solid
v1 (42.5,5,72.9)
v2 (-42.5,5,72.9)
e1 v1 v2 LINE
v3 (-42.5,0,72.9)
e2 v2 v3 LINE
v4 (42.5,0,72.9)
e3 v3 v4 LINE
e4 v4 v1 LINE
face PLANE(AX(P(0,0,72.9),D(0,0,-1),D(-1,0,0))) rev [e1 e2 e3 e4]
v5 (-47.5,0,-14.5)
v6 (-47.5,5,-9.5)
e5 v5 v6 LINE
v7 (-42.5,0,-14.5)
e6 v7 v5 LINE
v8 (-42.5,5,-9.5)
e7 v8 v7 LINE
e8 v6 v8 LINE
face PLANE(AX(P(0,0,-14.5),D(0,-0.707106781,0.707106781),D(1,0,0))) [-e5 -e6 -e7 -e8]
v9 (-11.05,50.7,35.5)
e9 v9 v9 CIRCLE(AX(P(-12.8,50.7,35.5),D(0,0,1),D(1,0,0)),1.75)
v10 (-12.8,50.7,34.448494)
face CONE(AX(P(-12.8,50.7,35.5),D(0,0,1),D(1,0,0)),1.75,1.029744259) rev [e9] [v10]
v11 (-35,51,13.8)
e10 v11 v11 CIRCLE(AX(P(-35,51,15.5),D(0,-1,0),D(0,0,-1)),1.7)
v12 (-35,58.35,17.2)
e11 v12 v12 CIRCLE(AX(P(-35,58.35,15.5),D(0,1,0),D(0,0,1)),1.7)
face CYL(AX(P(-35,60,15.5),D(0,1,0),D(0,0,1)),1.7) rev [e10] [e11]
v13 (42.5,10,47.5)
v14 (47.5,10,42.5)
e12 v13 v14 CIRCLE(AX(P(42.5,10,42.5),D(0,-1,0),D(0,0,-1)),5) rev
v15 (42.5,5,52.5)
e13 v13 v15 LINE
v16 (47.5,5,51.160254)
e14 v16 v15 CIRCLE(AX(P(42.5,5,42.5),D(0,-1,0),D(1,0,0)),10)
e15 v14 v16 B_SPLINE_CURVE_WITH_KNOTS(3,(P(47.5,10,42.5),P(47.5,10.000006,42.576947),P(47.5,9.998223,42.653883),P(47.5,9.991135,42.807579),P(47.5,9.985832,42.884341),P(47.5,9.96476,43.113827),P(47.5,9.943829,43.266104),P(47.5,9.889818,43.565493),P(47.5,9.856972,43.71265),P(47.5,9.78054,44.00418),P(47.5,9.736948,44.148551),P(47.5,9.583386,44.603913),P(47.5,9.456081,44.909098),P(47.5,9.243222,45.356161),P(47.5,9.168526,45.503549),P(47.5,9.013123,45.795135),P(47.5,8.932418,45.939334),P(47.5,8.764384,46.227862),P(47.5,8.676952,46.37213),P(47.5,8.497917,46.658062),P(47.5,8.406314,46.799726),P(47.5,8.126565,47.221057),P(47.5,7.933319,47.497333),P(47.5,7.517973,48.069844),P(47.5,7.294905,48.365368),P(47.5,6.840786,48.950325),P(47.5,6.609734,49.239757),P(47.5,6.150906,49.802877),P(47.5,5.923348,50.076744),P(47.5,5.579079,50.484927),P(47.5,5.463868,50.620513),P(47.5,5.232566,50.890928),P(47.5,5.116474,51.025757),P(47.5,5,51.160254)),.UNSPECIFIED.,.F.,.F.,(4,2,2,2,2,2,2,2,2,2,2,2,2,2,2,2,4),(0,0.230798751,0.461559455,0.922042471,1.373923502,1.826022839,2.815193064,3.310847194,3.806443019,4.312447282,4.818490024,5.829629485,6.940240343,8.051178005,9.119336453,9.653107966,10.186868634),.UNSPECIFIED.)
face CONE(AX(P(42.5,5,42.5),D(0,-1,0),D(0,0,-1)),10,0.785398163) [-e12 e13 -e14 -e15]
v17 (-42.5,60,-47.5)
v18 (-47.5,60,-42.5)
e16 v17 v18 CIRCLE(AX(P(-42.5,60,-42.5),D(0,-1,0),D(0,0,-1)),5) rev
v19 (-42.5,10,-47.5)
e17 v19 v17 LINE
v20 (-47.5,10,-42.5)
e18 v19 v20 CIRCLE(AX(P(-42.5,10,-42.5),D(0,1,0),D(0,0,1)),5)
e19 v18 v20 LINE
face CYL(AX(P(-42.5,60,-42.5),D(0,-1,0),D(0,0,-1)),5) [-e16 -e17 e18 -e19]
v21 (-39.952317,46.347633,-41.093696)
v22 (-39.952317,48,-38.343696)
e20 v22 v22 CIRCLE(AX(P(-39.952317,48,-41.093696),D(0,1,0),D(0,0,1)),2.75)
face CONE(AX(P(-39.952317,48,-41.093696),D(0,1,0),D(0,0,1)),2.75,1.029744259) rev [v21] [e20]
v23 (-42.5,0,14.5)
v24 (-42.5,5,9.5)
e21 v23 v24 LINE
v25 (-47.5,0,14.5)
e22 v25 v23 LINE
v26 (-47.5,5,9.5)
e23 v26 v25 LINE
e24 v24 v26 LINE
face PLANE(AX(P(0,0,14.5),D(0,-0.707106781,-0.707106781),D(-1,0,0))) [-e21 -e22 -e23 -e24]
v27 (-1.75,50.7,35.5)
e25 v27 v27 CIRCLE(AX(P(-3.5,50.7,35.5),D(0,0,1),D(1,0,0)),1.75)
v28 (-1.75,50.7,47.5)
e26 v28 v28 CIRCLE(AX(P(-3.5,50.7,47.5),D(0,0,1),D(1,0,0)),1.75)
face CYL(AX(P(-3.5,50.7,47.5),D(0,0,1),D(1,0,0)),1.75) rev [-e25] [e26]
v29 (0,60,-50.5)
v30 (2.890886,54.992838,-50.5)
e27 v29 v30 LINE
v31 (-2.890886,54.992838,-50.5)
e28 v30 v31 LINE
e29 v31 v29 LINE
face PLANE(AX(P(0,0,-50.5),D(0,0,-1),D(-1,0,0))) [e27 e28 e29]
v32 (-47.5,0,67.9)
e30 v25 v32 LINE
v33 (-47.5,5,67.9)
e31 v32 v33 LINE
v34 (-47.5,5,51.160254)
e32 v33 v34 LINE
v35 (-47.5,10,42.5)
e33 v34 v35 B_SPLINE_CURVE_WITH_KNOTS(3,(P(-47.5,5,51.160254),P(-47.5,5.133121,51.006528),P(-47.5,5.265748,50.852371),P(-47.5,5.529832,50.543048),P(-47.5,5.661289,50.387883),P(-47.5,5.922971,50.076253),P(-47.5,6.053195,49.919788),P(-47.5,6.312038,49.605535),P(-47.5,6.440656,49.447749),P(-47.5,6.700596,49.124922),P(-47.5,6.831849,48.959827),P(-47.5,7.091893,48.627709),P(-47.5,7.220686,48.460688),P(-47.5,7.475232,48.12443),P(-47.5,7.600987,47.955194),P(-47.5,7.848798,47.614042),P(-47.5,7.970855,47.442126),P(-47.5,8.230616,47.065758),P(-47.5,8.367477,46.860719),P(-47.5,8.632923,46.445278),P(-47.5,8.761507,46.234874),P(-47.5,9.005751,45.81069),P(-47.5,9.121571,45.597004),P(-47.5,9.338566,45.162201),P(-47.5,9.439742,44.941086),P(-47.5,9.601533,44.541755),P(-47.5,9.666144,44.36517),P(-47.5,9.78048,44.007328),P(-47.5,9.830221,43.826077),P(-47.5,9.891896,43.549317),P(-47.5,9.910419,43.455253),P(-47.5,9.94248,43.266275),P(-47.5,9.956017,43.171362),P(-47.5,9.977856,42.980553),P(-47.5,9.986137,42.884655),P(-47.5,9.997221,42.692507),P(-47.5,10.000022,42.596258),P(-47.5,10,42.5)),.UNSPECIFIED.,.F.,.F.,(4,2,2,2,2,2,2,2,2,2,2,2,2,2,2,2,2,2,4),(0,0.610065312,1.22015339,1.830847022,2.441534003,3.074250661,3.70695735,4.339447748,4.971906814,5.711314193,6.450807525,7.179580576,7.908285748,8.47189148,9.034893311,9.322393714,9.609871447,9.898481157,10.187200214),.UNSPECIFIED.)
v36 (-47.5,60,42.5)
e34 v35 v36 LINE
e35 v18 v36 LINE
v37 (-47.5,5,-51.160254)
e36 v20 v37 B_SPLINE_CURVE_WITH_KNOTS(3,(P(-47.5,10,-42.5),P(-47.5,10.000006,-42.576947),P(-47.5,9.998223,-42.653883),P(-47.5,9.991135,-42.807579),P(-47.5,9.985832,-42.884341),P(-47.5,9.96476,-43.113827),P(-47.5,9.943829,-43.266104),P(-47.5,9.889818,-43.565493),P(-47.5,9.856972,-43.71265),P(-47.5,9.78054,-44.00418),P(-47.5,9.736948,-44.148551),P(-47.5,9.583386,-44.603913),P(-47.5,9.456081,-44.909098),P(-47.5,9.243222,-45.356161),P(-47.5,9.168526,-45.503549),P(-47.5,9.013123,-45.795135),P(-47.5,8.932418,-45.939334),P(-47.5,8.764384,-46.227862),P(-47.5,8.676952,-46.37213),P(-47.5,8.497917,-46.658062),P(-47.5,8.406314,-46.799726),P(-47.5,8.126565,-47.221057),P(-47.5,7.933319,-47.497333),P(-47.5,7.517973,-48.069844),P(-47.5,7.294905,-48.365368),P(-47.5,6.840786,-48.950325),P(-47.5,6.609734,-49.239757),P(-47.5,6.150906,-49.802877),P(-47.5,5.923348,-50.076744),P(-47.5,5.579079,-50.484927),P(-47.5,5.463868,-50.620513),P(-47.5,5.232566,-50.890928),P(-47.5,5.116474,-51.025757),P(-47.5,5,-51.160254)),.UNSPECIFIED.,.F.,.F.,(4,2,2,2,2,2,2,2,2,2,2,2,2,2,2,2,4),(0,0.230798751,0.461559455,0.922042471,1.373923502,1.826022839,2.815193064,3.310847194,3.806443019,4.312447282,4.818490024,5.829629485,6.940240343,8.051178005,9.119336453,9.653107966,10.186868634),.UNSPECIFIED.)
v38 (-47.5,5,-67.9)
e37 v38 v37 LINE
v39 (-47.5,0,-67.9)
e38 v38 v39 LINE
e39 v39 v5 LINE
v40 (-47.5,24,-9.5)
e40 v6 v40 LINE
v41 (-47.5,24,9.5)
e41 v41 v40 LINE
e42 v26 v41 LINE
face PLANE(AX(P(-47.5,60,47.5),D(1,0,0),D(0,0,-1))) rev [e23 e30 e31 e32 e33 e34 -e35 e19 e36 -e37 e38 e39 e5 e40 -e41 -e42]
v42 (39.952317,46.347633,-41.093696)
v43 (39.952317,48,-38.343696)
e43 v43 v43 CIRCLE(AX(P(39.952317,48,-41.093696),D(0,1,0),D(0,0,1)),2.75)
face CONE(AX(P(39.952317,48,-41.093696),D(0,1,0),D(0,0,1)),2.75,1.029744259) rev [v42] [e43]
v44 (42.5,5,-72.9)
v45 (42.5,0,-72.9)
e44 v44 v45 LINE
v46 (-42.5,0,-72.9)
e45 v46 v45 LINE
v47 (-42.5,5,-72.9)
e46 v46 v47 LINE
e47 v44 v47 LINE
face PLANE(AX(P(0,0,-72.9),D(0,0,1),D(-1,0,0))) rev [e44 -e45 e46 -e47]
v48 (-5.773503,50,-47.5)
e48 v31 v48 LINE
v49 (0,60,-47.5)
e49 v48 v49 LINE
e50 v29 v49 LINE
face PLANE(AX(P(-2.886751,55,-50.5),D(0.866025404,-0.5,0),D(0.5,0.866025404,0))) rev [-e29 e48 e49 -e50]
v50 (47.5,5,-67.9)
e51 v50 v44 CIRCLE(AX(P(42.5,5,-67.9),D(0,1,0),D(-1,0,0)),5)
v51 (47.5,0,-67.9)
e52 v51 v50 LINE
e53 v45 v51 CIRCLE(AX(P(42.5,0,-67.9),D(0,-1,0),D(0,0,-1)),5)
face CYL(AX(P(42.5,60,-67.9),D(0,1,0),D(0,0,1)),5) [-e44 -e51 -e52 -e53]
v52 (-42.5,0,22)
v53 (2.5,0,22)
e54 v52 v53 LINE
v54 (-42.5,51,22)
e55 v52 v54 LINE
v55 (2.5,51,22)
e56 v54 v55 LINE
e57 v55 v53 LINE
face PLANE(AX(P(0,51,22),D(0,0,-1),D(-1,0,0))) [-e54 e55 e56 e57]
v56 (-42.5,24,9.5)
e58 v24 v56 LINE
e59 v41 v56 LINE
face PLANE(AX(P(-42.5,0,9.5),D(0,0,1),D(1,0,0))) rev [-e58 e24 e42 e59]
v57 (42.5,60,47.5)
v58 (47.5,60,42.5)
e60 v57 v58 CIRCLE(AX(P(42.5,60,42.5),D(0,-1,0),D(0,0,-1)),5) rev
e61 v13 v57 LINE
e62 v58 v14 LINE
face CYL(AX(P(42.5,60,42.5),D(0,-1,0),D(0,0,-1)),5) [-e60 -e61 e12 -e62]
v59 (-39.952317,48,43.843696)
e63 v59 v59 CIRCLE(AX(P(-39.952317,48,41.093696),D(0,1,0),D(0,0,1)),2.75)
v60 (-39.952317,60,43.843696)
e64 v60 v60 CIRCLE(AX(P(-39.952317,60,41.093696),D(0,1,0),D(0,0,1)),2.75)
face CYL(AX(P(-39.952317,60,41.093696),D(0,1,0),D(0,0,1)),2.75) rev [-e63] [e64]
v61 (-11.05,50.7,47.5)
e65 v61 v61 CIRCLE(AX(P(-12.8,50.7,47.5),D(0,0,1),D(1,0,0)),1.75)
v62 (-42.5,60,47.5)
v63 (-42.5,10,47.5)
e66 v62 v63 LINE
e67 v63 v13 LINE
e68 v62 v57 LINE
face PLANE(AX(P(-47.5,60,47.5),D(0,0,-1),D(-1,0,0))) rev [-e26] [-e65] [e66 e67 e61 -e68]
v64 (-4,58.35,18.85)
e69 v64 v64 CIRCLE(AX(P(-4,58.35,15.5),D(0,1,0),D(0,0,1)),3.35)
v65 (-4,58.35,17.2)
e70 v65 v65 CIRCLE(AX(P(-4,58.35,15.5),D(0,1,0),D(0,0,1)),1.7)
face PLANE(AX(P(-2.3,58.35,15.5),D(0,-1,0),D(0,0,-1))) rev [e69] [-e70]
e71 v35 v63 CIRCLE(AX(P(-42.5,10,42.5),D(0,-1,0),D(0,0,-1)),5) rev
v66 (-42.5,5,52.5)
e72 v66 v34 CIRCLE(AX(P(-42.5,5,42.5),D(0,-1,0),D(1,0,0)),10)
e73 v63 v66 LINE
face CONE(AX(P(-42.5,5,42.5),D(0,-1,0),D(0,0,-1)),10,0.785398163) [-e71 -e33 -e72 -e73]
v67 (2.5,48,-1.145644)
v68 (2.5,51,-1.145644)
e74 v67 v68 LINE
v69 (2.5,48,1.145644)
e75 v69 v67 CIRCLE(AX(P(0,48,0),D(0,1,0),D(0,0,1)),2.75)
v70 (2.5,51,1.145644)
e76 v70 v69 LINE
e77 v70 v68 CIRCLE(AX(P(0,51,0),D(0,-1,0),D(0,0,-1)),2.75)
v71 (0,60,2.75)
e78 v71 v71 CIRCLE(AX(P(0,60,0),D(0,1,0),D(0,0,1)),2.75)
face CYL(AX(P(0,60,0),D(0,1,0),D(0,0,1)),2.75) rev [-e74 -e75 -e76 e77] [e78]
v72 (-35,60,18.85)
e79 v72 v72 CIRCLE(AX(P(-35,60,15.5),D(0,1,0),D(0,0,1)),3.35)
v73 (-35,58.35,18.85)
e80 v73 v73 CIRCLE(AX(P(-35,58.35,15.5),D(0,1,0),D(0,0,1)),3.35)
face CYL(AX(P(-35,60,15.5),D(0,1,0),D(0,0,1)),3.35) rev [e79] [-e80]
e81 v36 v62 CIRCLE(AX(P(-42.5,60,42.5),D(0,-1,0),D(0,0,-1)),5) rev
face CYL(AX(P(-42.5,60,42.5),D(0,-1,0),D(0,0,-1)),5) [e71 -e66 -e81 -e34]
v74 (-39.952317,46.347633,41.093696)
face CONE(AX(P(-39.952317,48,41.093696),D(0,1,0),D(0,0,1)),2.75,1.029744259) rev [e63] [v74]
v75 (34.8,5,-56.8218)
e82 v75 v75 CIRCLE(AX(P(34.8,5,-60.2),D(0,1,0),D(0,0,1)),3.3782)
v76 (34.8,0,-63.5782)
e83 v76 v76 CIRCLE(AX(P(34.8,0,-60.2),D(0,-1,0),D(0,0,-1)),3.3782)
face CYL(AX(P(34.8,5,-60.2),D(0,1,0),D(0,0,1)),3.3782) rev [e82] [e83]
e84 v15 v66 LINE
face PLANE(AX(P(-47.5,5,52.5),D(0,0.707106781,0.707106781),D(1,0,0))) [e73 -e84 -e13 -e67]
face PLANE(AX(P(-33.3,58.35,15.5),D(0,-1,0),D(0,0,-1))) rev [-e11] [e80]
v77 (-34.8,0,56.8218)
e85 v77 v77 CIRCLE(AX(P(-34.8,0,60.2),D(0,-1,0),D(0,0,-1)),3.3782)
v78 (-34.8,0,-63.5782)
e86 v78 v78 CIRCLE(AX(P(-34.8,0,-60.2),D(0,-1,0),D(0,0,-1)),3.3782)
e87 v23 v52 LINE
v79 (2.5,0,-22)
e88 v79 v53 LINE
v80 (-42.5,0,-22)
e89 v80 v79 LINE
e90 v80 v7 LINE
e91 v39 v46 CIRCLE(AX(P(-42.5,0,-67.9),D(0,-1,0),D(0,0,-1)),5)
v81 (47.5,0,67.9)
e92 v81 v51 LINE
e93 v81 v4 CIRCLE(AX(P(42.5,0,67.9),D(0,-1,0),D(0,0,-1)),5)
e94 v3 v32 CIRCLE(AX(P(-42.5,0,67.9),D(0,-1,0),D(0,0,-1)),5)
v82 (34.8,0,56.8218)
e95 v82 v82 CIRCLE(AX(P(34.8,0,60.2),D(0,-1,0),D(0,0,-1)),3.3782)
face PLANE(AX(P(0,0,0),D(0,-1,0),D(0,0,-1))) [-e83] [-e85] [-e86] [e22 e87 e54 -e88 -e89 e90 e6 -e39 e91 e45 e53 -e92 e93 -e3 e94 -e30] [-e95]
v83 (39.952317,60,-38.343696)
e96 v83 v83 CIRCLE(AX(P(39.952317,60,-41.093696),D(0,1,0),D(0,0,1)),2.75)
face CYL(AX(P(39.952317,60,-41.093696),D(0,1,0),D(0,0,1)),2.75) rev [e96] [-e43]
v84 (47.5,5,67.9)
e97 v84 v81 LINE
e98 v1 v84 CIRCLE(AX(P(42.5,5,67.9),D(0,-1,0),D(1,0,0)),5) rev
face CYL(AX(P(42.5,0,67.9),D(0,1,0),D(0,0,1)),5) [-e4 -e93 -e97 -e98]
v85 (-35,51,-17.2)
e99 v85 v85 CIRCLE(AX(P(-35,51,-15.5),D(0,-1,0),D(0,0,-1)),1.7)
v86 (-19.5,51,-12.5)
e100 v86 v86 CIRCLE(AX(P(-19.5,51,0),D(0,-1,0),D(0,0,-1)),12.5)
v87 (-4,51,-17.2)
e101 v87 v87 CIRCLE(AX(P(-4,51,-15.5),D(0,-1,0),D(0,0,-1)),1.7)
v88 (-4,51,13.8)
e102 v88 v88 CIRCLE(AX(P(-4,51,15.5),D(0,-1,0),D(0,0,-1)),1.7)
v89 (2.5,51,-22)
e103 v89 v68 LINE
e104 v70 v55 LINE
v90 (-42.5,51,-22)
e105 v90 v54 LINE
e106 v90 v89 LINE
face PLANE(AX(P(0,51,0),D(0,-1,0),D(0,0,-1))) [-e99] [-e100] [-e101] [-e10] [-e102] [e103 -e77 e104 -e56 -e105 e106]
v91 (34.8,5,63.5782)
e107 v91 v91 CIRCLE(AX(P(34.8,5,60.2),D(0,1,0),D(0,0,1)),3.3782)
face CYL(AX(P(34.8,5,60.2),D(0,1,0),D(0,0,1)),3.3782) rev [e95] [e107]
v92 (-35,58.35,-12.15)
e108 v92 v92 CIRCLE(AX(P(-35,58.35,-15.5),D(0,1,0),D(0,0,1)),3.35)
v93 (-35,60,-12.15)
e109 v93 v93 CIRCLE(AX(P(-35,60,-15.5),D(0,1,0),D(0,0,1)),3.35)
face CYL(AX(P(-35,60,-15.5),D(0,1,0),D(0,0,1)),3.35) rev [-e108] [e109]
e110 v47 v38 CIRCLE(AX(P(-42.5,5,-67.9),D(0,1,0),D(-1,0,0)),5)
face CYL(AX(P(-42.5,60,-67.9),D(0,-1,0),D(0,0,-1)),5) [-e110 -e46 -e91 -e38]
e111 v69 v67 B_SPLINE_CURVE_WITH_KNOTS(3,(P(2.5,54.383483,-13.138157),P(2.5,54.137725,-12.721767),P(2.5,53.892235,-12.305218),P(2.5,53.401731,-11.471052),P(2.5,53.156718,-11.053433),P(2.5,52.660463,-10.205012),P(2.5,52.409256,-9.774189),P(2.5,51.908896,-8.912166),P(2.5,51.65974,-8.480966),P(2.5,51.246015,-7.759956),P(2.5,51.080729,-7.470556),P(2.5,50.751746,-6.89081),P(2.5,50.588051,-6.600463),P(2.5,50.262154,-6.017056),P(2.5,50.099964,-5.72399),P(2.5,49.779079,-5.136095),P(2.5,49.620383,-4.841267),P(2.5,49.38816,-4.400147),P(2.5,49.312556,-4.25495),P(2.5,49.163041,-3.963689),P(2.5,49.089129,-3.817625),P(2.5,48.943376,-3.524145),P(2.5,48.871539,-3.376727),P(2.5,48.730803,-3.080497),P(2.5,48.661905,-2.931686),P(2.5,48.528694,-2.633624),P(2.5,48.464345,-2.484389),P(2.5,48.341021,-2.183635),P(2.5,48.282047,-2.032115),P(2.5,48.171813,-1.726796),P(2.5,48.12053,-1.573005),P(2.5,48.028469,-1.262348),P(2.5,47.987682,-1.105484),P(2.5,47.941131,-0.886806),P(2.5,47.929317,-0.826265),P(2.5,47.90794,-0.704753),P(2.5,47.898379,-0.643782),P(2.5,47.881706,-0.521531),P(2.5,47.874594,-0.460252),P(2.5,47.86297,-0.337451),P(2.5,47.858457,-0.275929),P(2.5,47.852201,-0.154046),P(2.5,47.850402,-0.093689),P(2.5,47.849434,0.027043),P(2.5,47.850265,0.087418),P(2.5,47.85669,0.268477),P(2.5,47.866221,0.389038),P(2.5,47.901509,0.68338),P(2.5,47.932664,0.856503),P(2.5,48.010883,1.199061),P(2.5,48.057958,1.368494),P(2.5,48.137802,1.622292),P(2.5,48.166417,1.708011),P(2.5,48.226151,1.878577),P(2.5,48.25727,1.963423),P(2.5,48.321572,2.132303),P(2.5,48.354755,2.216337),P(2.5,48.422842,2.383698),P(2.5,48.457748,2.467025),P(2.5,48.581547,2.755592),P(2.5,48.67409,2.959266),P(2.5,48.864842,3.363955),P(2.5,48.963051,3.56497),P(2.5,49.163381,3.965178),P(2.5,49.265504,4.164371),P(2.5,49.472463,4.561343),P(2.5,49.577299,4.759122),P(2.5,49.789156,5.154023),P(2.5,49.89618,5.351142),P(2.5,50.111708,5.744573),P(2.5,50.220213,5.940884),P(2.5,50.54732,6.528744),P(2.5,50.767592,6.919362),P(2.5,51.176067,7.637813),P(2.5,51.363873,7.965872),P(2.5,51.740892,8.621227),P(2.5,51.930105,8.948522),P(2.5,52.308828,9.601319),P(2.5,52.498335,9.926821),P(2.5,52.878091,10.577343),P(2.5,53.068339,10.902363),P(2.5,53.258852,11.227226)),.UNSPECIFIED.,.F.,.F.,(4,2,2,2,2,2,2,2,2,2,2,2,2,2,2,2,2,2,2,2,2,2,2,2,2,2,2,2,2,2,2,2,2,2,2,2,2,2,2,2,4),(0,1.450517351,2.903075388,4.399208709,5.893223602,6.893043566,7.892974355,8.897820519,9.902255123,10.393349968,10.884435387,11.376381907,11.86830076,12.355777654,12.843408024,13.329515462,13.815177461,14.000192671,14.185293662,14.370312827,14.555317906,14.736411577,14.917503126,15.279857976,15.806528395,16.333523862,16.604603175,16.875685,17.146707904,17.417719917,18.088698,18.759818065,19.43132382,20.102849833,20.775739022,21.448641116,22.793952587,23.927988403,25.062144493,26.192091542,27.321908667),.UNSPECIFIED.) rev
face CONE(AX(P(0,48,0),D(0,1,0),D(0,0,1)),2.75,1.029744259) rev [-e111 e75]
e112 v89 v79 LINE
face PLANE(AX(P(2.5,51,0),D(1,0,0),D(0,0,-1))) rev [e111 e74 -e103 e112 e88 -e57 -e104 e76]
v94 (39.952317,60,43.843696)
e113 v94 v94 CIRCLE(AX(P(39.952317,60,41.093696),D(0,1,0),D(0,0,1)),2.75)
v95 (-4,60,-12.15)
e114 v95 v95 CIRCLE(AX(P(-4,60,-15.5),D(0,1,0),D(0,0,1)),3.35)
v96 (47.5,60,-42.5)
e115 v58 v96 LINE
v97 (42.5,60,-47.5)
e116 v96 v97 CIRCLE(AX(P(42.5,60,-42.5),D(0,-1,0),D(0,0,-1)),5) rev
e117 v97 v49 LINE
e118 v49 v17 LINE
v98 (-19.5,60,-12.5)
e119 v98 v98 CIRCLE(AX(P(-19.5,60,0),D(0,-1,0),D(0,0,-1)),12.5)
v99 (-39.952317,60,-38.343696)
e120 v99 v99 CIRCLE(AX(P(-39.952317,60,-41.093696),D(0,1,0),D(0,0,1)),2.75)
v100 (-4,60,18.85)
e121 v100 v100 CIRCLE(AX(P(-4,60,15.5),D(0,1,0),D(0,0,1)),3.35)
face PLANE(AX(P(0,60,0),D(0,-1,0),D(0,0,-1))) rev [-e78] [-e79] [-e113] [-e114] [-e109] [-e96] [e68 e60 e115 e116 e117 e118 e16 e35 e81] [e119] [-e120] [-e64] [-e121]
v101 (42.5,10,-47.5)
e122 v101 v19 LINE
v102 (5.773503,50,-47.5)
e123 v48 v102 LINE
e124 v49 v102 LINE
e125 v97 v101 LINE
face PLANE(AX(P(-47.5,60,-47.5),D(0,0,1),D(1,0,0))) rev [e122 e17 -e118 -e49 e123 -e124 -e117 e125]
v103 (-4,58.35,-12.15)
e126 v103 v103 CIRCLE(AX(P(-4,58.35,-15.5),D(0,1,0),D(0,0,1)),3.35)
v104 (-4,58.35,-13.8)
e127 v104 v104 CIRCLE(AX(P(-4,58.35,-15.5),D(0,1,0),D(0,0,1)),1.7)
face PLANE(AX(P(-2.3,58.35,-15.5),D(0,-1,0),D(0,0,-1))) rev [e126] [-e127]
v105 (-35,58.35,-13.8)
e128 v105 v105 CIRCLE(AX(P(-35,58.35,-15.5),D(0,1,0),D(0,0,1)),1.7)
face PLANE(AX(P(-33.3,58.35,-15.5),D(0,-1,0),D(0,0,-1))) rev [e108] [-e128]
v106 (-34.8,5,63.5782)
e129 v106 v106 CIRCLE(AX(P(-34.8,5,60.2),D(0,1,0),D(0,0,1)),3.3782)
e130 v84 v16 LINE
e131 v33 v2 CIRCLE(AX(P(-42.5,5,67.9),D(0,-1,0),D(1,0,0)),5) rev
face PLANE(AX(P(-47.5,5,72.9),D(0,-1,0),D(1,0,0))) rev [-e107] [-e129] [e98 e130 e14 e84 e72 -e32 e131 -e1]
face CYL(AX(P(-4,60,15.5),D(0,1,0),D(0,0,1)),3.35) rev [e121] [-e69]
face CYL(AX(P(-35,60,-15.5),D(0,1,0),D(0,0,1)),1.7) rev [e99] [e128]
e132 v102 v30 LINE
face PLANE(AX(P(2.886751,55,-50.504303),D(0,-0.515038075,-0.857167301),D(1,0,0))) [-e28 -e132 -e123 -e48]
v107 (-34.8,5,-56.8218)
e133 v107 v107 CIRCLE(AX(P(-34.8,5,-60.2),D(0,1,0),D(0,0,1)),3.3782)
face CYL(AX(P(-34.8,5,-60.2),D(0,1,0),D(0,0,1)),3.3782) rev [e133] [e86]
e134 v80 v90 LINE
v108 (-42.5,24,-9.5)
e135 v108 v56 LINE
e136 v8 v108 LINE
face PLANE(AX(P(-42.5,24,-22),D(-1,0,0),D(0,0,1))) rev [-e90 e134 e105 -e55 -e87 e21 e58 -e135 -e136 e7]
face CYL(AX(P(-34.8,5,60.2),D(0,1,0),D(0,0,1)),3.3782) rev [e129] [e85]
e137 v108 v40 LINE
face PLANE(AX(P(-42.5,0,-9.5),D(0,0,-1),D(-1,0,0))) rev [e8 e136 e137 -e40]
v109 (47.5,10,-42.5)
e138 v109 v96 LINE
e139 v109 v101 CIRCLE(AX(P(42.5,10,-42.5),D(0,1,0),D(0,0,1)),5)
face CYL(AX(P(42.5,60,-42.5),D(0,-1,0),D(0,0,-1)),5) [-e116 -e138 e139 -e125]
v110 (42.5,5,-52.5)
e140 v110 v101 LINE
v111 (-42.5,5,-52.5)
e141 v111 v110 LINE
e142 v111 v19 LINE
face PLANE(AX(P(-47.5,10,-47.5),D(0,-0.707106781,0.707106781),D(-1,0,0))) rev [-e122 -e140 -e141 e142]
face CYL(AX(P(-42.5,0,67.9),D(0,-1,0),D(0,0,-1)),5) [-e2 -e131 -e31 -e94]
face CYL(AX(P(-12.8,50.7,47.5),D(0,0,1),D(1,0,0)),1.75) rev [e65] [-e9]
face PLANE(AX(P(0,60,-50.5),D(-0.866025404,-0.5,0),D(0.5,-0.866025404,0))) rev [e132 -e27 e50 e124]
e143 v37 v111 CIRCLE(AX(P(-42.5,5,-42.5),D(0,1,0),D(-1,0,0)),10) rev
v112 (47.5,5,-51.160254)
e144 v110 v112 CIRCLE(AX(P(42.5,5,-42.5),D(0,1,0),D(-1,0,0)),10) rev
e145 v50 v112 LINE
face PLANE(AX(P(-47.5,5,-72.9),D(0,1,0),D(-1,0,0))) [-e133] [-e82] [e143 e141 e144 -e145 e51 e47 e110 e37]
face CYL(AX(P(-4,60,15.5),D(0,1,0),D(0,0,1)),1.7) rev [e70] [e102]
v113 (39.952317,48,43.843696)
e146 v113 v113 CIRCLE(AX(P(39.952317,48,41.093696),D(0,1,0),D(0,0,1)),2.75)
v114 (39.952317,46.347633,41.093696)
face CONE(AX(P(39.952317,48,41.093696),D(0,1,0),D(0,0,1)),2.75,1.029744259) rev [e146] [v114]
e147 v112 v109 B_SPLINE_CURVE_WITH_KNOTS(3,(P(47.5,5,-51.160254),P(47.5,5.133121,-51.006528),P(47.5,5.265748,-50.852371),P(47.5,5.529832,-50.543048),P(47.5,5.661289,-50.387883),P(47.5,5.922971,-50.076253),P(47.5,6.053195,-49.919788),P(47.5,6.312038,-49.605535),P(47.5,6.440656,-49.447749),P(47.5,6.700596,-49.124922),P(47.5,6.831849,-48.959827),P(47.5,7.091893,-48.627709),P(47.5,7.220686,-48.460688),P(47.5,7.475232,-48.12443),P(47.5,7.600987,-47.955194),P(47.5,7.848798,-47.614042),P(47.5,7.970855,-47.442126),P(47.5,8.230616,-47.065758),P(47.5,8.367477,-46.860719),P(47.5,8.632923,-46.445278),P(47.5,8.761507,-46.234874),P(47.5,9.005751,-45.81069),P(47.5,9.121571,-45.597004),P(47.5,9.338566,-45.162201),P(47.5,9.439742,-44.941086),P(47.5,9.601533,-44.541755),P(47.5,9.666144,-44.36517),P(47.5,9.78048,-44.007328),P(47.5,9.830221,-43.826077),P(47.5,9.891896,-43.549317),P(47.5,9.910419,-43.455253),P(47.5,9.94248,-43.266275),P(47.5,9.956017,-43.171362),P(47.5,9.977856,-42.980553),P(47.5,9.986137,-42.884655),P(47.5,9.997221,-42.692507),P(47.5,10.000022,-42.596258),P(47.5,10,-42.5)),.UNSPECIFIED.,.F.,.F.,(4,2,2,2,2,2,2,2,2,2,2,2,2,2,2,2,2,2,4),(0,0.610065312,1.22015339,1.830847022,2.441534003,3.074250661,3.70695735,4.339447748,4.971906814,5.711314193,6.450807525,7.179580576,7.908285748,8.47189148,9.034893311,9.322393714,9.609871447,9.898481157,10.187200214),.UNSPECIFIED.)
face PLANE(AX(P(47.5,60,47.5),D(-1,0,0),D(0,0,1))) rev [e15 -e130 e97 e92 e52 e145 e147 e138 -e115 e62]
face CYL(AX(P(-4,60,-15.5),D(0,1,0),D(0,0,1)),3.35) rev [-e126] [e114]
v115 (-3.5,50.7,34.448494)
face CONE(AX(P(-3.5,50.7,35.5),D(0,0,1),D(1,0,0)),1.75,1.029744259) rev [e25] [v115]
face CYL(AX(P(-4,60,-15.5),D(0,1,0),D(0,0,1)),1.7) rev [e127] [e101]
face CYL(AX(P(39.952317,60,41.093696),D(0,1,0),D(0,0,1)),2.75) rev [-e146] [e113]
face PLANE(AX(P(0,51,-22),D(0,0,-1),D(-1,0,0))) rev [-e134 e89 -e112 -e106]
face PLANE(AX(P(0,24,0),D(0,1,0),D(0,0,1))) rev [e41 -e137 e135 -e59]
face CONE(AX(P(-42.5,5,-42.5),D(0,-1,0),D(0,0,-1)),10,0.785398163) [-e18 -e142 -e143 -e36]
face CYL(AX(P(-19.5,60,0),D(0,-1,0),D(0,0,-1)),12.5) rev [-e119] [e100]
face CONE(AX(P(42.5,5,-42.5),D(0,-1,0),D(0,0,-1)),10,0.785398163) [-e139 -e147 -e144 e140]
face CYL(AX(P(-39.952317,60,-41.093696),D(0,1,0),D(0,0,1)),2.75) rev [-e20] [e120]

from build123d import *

# Parameters (mm, degrees)
SKETCH1_W                        = 95
SKETCH1_H                        = 95
BOSS_EXTRUDE1_DEPTH              = 60
SKETCH2_W                        = 95
SKETCH2_H                        = 5
BOSS_EXTRUDE2_DEPTH              = 25.4
FILLET1_R                        = 5
F_1_4_CLEARANCE_HOLE1_AT_2_COUNT = 2
F_1_4_CLEARANCE_HOLE1_AT_2_PITCH = 69.6
BOSS_EXTRUDE3_DEPTH              = 3
CHAMFER1_SIZE                    = 5
CHAMFER1_SIZE_2                  = 3.004303095
SKETCH6_W                        = 50
SKETCH6_H                        = 44
CUT_EXTRUDE1_DEPTH               = 51
SKETCH6_3_R                      = 12.5
CUT_EXTRUDE2_DEPTH               = 106.69134307
SKETCH7_W                        = 5
SKETCH7_H                        = 44
BOSS_EXTRUDE4_DEPTH              = 27
SKETCH8_W                        = 5
SKETCH8_H                        = 12.5
BOSS_EXTRUDE5_DEPTH              = 24
CBORE_FOR_M3_SBHCS1_D            = 3.4
CBORE_FOR_M3_SBHCS1_CBORE_D      = 6.7
CBORE_FOR_M3_SBHCS1_CBORE_DEPTH  = 1.65
CHAMFER2_SIZE                    = 5
CHAMFER3_SIZE                    = 5
F_6_0MM_DOWEL_HOLE1_D            = 5.5
F_6_0MM_DOWEL_HOLE1_DEPTH        = 12
F_6_0MM_DOWEL_HOLE1_TIP          = 1.652366702
F_3_0MM_DOWEL_HOLE1_D            = 3.5
F_3_0MM_DOWEL_HOLE1_DEPTH        = 12
F_3_0MM_DOWEL_HOLE1_TIP          = 1.051506083


with BuildPart() as part:
    # Sketch1 → Boss-Extrude1 (new body)
    with BuildSketch(Plane(origin=(0, 0, 0), x_dir=(1, 0, 0), z_dir=(0, 1, 0))):
        Rectangle(SKETCH1_W, SKETCH1_H)
    extrude(amount=BOSS_EXTRUDE1_DEPTH)

    # Sketch2 → Boss-Extrude2 (add)
    with BuildSketch(Plane.XY.offset(47.5)):
        with Locations((0, 2.5)):
            Rectangle(SKETCH2_W, SKETCH2_H)
    boss_extrude2 = extrude(amount=BOSS_EXTRUDE2_DEPTH)

    # Mirror1: Boss-Extrude2 across plane
    add(boss_extrude2.mirror(Plane.XY))

    # Fillet1
    fillet1_edges = [part.edges().sort_by_distance(p)[0] for p in [
        (-47.5, 2.5, 72.9),
        (47.5, 2.5, 72.9),
        (-47.5, 2.5, -72.9),
        (47.5, 2.5, -72.9),
        (47.5, 32.5, 47.5),
        (-47.5, 32.5, 47.5),
        (-47.5, 32.5, -47.5),
        (47.5, 32.5, -47.5),
    ]]
    fillet(fillet1_edges, radius=FILLET1_R)

    # Sketch4 → 1/4 Clearance Hole1 (revolve, cut)
    with BuildSketch(Plane(origin=(34.8, 5, 60.2), x_dir=(0, 0, 1), z_dir=(1, 0, 0))):
        Polygon((0, 0), (0, 12.029827343), (3.3782, 10), (3.3782, 0), align=None)
    f_1_4_clearance_hole1 = revolve(axis=Axis((34.8, 11.35, 60.2), (0, -1, 0)), mode=Mode.SUBTRACT)

    # 1/4 Clearance Hole1 at 2: 1/4 Clearance Hole1 ×2
    with Locations(*[(-i * F_1_4_CLEARANCE_HOLE1_AT_2_PITCH, 0, 0) for i in range(1, F_1_4_CLEARANCE_HOLE1_AT_2_COUNT)]):
        add(f_1_4_clearance_hole1, mode=Mode.SUBTRACT)

    # Mirror2: 1/4 Clearance Hole1 across plane
    add(f_1_4_clearance_hole1.mirror(Plane.XY), mode=Mode.SUBTRACT)

    # Mirror2 copy 1 sketch → Mirror2 copy 1 (revolve, cut)
    with BuildSketch(Plane(origin=(-34.8, 5, -60.2), x_dir=(0, 0, -1), z_dir=(1, 0, 0))):
        Polygon((0, 0), (0, -12.029827343), (3.3782, -10), (3.3782, 0), align=None)
    revolve(axis=Axis((-34.8, 11.35, -60.2), (0, 1, 0)), mode=Mode.SUBTRACT)

    # Sketch5 → Boss-Extrude3 (add)
    with BuildSketch(Plane(origin=(0, 0, -47.5), x_dir=(-1, 0, 0), z_dir=(0, 0, -1))):
        Polygon((0, 60), (-2.886751346, 55), (2.886751346, 55), align=None)
    extrude(amount=BOSS_EXTRUDE3_DEPTH)

    # Chamfer1
    # the kernel refuses this chamfer: 5, 3.004303095 mm, written as the material it adds along each edge
    with BuildSketch(Plane(origin=(15.817899449, 55, -47.5), x_dir=(0, -0.9998016840798124, 0.01991463058083395), z_dir=(-1, 0, 0))) as chamfer1_piece_1_section:
        Polygon((CHAMFER1_SIZE * 0.99980168408, -CHAMFER1_SIZE * 0.0199146305808), (-CHAMFER1_SIZE_2 * 0.0199146305817, -CHAMFER1_SIZE_2 * 0.999801684126), (0, 0), align=None)
    chamfer1_piece_1 = extrude(amount=31.635798898, mode=Mode.PRIVATE)
    chamfer1_piece_1 = split(chamfer1_piece_1, bisect_by=Plane(origin=(-2.998221353, 54.806928285, -48.382310959), z_dir=(0.8660254037844363, -0.5000000000000041, 0)), keep=Keep.TOP, mode=Mode.PRIVATE)
    chamfer1_piece_1 = split(chamfer1_piece_1, bisect_by=Plane(origin=(2.998221353, 54.806928285, -48.382310959), z_dir=(-0.8660254037844365, -0.5000000000000039, 0)), keep=Keep.TOP, mode=Mode.PRIVATE)
    chamfer1_piece_1 = split(chamfer1_piece_1, bisect_by=Plane(origin=(0, 53.07590438, -50.5), z_dir=(0, 0, 1)), keep=Keep.TOP, mode=Mode.PRIVATE)
    add(chamfer1_piece_1)

    # Sketch6 → Cut-Extrude1 (cut)
    with BuildSketch(Plane.XZ):
        with Locations((-22.5, 0)):
            Rectangle(SKETCH6_W, SKETCH6_H)
    extrude(amount=-CUT_EXTRUDE1_DEPTH, mode=Mode.SUBTRACT)

    # Sketch6<3> → Cut-Extrude2 (cut, through all)
    with BuildSketch(Plane.XZ):
        with Locations(Location((-19.5, 0, 0), (0, 0, 270))):
            Circle(SKETCH6_3_R)
    extrude(amount=-CUT_EXTRUDE2_DEPTH, mode=Mode.SUBTRACT)

    # Sketch7 → Boss-Extrude4 (add)
    with BuildSketch(Plane.XZ.offset(-51)):
        with Locations((-45, 0)):
            Rectangle(SKETCH7_W, SKETCH7_H)
    extrude(amount=BOSS_EXTRUDE4_DEPTH)

    # Sketch8 → Boss-Extrude5 (add)
    with BuildSketch(Plane.XZ.offset(-24)):
        with Locations((-45, -15.75)):
            Rectangle(SKETCH8_W, SKETCH8_H)
        with Locations((-45, 15.75)):
            Rectangle(SKETCH8_W, SKETCH8_H)
    extrude(amount=BOSS_EXTRUDE5_DEPTH)

    # CBORE for M3 SBHCS1 (through all)
    with Locations(Plane(origin=(0, 60, 0), x_dir=(1, 0, 0), z_dir=(0, 1, 0))):
        with Locations((-19.5, 0), (-4, -15.5), (-35, 15.5), (-35, -15.5), (-4, 15.5)):
            CounterBoreHole(CBORE_FOR_M3_SBHCS1_D / 2, CBORE_FOR_M3_SBHCS1_CBORE_D / 2, CBORE_FOR_M3_SBHCS1_CBORE_DEPTH)

    # Chamfer2
    # the kernel refuses this chamfer: 5 mm, written as the material it adds along each edge
    with BuildSketch(Plane(origin=(42.5, 5, -47.5), x_dir=(0, 0.9996219169112969, 0.0274958766105808), z_dir=(-1, 0, 0))) as chamfer2_piece_1:
        Polygon((CHAMFER2_SIZE * 0.999621916911, CHAMFER2_SIZE * 0.0274958766106), (-CHAMFER2_SIZE * 0.0274958766106, CHAMFER2_SIZE * 0.999621916911), (0, 0), align=None)
    extrude(amount=85)
    with BuildSketch(Plane(origin=(42.5, 5, 47.5), x_dir=(0, 0.9996219169112968, -0.027495876610586324), z_dir=(-1, 0, 0))) as chamfer2_piece_2:
        Polygon((CHAMFER2_SIZE * 0.999621916911, -CHAMFER2_SIZE * 0.0274958766106), (-CHAMFER2_SIZE * 0.0274958766106, -CHAMFER2_SIZE * 0.999621916911), (0, 0), align=None)
    extrude(amount=85)
    with BuildSketch(Plane(origin=(-42.5, 5, 42.5), x_dir=(0, 0, 1), z_dir=(1, 0, 0))) as chamfer2_piece_3_section:
        Polygon((5, -CHAMFER2_SIZE), (5 + CHAMFER2_SIZE, 0), (5, 0), align=None)
    chamfer2_piece_3 = revolve(axis=Axis((-42.5, 5, 42.5), (0, -1, 0)), revolution_arc=237.405771779, mode=Mode.PRIVATE)
    chamfer2_piece_3 = split(chamfer2_piece_3, bisect_by=Plane(origin=(-47.5, 7.211903133, 46.338242127), z_dir=(1, 0, 0)), keep=Keep.TOP, mode=Mode.PRIVATE)
    add(chamfer2_piece_3)
    with BuildSketch(Plane(origin=(42.5, 5, 42.5), x_dir=(0, 0, 1), z_dir=(-1, 0, 0))) as chamfer2_piece_4_section:
        Polygon((5, CHAMFER2_SIZE), (5 + CHAMFER2_SIZE, 0), (5, 0), align=None)
    chamfer2_piece_4 = revolve(axis=Axis((42.5, 5, 42.5), (0, 1, 0)), revolution_arc=237.405771779, mode=Mode.PRIVATE)
    chamfer2_piece_4 = split(chamfer2_piece_4, bisect_by=Plane(origin=(47.5, 7.211903133, 46.338242127), z_dir=(-1, 0, 0)), keep=Keep.TOP, mode=Mode.PRIVATE)
    add(chamfer2_piece_4)
    with BuildSketch(Plane(origin=(42.5, 5, -42.5), x_dir=(0, 0, -1), z_dir=(-1, 0, 0))) as chamfer2_piece_5_section:
        Polygon((5 + CHAMFER2_SIZE, 0), (5, -CHAMFER2_SIZE), (5, 0), align=None)
    chamfer2_piece_5 = revolve(axis=Axis((42.5, 5, -42.5), (0, -1, 0)), revolution_arc=237.405771779, mode=Mode.PRIVATE)
    chamfer2_piece_5 = split(chamfer2_piece_5, bisect_by=Plane(origin=(47.5, 6.474161158, -49.057149182), z_dir=(-1, 0, 0)), keep=Keep.TOP, mode=Mode.PRIVATE)
    add(chamfer2_piece_5)
    with BuildSketch(Plane(origin=(-42.5, 5, -42.5), x_dir=(0.8425066666450718, 0, 0.5386859165215014), z_dir=(0.5386859165215014, 0, -0.8425066666450718))) as chamfer2_piece_6_section:
        Polygon((5 + CHAMFER2_SIZE, 0), (5, -CHAMFER2_SIZE), (5, 0), align=None)
    chamfer2_piece_6 = revolve(axis=Axis((-42.5, 5, -42.5), (0, -1, 0)), revolution_arc=237.405771779, mode=Mode.PRIVATE)
    chamfer2_piece_6 = split(chamfer2_piece_6, bisect_by=Plane(origin=(-47.5, 7.211903133, -46.338242127), z_dir=(1, 0, 0)), keep=Keep.TOP, mode=Mode.PRIVATE)
    add(chamfer2_piece_6)

    # Chamfer3
    chamfer3_edges = [part.edges().sort_by_distance(p)[0] for p in [
        (-45, 0, -9.5),
        (-45, 0, 9.5),
    ]]
    chamfer(chamfer3_edges, length=CHAMFER3_SIZE)

    # Ø6.0mm Dowel Hole1
    with Locations(Plane(origin=(0, 60, 0), x_dir=(1, 0, 0), z_dir=(0, 1, 0))):
        with Locations((0, 0), (39.952317218, 41.093696451), (-39.952317218, -41.093696451), (-39.952317218, 41.093696451), (39.952317218, -41.093696451)):
            Hole(F_6_0MM_DOWEL_HOLE1_D / 2, depth=F_6_0MM_DOWEL_HOLE1_DEPTH)
            with Locations((0, 0, -(F_6_0MM_DOWEL_HOLE1_DEPTH + F_6_0MM_DOWEL_HOLE1_TIP / 2))):  # 118° drill point
                Cone(0, F_6_0MM_DOWEL_HOLE1_D / 2, F_6_0MM_DOWEL_HOLE1_TIP, mode=Mode.SUBTRACT)

    # Ø3.0mm Dowel Hole1
    with Locations(Plane.XY.offset(47.5)):
        with Locations((-3.5, 50.7), (-12.8, 50.7)):
            Hole(F_3_0MM_DOWEL_HOLE1_D / 2, depth=F_3_0MM_DOWEL_HOLE1_DEPTH)
            with Locations((0, 0, -(F_3_0MM_DOWEL_HOLE1_DEPTH + F_3_0MM_DOWEL_HOLE1_TIP / 2))):  # 118° drill point
                Cone(0, F_3_0MM_DOWEL_HOLE1_D / 2, F_3_0MM_DOWEL_HOLE1_TIP, mode=Mode.SUBTRACT)


solid = part.part
